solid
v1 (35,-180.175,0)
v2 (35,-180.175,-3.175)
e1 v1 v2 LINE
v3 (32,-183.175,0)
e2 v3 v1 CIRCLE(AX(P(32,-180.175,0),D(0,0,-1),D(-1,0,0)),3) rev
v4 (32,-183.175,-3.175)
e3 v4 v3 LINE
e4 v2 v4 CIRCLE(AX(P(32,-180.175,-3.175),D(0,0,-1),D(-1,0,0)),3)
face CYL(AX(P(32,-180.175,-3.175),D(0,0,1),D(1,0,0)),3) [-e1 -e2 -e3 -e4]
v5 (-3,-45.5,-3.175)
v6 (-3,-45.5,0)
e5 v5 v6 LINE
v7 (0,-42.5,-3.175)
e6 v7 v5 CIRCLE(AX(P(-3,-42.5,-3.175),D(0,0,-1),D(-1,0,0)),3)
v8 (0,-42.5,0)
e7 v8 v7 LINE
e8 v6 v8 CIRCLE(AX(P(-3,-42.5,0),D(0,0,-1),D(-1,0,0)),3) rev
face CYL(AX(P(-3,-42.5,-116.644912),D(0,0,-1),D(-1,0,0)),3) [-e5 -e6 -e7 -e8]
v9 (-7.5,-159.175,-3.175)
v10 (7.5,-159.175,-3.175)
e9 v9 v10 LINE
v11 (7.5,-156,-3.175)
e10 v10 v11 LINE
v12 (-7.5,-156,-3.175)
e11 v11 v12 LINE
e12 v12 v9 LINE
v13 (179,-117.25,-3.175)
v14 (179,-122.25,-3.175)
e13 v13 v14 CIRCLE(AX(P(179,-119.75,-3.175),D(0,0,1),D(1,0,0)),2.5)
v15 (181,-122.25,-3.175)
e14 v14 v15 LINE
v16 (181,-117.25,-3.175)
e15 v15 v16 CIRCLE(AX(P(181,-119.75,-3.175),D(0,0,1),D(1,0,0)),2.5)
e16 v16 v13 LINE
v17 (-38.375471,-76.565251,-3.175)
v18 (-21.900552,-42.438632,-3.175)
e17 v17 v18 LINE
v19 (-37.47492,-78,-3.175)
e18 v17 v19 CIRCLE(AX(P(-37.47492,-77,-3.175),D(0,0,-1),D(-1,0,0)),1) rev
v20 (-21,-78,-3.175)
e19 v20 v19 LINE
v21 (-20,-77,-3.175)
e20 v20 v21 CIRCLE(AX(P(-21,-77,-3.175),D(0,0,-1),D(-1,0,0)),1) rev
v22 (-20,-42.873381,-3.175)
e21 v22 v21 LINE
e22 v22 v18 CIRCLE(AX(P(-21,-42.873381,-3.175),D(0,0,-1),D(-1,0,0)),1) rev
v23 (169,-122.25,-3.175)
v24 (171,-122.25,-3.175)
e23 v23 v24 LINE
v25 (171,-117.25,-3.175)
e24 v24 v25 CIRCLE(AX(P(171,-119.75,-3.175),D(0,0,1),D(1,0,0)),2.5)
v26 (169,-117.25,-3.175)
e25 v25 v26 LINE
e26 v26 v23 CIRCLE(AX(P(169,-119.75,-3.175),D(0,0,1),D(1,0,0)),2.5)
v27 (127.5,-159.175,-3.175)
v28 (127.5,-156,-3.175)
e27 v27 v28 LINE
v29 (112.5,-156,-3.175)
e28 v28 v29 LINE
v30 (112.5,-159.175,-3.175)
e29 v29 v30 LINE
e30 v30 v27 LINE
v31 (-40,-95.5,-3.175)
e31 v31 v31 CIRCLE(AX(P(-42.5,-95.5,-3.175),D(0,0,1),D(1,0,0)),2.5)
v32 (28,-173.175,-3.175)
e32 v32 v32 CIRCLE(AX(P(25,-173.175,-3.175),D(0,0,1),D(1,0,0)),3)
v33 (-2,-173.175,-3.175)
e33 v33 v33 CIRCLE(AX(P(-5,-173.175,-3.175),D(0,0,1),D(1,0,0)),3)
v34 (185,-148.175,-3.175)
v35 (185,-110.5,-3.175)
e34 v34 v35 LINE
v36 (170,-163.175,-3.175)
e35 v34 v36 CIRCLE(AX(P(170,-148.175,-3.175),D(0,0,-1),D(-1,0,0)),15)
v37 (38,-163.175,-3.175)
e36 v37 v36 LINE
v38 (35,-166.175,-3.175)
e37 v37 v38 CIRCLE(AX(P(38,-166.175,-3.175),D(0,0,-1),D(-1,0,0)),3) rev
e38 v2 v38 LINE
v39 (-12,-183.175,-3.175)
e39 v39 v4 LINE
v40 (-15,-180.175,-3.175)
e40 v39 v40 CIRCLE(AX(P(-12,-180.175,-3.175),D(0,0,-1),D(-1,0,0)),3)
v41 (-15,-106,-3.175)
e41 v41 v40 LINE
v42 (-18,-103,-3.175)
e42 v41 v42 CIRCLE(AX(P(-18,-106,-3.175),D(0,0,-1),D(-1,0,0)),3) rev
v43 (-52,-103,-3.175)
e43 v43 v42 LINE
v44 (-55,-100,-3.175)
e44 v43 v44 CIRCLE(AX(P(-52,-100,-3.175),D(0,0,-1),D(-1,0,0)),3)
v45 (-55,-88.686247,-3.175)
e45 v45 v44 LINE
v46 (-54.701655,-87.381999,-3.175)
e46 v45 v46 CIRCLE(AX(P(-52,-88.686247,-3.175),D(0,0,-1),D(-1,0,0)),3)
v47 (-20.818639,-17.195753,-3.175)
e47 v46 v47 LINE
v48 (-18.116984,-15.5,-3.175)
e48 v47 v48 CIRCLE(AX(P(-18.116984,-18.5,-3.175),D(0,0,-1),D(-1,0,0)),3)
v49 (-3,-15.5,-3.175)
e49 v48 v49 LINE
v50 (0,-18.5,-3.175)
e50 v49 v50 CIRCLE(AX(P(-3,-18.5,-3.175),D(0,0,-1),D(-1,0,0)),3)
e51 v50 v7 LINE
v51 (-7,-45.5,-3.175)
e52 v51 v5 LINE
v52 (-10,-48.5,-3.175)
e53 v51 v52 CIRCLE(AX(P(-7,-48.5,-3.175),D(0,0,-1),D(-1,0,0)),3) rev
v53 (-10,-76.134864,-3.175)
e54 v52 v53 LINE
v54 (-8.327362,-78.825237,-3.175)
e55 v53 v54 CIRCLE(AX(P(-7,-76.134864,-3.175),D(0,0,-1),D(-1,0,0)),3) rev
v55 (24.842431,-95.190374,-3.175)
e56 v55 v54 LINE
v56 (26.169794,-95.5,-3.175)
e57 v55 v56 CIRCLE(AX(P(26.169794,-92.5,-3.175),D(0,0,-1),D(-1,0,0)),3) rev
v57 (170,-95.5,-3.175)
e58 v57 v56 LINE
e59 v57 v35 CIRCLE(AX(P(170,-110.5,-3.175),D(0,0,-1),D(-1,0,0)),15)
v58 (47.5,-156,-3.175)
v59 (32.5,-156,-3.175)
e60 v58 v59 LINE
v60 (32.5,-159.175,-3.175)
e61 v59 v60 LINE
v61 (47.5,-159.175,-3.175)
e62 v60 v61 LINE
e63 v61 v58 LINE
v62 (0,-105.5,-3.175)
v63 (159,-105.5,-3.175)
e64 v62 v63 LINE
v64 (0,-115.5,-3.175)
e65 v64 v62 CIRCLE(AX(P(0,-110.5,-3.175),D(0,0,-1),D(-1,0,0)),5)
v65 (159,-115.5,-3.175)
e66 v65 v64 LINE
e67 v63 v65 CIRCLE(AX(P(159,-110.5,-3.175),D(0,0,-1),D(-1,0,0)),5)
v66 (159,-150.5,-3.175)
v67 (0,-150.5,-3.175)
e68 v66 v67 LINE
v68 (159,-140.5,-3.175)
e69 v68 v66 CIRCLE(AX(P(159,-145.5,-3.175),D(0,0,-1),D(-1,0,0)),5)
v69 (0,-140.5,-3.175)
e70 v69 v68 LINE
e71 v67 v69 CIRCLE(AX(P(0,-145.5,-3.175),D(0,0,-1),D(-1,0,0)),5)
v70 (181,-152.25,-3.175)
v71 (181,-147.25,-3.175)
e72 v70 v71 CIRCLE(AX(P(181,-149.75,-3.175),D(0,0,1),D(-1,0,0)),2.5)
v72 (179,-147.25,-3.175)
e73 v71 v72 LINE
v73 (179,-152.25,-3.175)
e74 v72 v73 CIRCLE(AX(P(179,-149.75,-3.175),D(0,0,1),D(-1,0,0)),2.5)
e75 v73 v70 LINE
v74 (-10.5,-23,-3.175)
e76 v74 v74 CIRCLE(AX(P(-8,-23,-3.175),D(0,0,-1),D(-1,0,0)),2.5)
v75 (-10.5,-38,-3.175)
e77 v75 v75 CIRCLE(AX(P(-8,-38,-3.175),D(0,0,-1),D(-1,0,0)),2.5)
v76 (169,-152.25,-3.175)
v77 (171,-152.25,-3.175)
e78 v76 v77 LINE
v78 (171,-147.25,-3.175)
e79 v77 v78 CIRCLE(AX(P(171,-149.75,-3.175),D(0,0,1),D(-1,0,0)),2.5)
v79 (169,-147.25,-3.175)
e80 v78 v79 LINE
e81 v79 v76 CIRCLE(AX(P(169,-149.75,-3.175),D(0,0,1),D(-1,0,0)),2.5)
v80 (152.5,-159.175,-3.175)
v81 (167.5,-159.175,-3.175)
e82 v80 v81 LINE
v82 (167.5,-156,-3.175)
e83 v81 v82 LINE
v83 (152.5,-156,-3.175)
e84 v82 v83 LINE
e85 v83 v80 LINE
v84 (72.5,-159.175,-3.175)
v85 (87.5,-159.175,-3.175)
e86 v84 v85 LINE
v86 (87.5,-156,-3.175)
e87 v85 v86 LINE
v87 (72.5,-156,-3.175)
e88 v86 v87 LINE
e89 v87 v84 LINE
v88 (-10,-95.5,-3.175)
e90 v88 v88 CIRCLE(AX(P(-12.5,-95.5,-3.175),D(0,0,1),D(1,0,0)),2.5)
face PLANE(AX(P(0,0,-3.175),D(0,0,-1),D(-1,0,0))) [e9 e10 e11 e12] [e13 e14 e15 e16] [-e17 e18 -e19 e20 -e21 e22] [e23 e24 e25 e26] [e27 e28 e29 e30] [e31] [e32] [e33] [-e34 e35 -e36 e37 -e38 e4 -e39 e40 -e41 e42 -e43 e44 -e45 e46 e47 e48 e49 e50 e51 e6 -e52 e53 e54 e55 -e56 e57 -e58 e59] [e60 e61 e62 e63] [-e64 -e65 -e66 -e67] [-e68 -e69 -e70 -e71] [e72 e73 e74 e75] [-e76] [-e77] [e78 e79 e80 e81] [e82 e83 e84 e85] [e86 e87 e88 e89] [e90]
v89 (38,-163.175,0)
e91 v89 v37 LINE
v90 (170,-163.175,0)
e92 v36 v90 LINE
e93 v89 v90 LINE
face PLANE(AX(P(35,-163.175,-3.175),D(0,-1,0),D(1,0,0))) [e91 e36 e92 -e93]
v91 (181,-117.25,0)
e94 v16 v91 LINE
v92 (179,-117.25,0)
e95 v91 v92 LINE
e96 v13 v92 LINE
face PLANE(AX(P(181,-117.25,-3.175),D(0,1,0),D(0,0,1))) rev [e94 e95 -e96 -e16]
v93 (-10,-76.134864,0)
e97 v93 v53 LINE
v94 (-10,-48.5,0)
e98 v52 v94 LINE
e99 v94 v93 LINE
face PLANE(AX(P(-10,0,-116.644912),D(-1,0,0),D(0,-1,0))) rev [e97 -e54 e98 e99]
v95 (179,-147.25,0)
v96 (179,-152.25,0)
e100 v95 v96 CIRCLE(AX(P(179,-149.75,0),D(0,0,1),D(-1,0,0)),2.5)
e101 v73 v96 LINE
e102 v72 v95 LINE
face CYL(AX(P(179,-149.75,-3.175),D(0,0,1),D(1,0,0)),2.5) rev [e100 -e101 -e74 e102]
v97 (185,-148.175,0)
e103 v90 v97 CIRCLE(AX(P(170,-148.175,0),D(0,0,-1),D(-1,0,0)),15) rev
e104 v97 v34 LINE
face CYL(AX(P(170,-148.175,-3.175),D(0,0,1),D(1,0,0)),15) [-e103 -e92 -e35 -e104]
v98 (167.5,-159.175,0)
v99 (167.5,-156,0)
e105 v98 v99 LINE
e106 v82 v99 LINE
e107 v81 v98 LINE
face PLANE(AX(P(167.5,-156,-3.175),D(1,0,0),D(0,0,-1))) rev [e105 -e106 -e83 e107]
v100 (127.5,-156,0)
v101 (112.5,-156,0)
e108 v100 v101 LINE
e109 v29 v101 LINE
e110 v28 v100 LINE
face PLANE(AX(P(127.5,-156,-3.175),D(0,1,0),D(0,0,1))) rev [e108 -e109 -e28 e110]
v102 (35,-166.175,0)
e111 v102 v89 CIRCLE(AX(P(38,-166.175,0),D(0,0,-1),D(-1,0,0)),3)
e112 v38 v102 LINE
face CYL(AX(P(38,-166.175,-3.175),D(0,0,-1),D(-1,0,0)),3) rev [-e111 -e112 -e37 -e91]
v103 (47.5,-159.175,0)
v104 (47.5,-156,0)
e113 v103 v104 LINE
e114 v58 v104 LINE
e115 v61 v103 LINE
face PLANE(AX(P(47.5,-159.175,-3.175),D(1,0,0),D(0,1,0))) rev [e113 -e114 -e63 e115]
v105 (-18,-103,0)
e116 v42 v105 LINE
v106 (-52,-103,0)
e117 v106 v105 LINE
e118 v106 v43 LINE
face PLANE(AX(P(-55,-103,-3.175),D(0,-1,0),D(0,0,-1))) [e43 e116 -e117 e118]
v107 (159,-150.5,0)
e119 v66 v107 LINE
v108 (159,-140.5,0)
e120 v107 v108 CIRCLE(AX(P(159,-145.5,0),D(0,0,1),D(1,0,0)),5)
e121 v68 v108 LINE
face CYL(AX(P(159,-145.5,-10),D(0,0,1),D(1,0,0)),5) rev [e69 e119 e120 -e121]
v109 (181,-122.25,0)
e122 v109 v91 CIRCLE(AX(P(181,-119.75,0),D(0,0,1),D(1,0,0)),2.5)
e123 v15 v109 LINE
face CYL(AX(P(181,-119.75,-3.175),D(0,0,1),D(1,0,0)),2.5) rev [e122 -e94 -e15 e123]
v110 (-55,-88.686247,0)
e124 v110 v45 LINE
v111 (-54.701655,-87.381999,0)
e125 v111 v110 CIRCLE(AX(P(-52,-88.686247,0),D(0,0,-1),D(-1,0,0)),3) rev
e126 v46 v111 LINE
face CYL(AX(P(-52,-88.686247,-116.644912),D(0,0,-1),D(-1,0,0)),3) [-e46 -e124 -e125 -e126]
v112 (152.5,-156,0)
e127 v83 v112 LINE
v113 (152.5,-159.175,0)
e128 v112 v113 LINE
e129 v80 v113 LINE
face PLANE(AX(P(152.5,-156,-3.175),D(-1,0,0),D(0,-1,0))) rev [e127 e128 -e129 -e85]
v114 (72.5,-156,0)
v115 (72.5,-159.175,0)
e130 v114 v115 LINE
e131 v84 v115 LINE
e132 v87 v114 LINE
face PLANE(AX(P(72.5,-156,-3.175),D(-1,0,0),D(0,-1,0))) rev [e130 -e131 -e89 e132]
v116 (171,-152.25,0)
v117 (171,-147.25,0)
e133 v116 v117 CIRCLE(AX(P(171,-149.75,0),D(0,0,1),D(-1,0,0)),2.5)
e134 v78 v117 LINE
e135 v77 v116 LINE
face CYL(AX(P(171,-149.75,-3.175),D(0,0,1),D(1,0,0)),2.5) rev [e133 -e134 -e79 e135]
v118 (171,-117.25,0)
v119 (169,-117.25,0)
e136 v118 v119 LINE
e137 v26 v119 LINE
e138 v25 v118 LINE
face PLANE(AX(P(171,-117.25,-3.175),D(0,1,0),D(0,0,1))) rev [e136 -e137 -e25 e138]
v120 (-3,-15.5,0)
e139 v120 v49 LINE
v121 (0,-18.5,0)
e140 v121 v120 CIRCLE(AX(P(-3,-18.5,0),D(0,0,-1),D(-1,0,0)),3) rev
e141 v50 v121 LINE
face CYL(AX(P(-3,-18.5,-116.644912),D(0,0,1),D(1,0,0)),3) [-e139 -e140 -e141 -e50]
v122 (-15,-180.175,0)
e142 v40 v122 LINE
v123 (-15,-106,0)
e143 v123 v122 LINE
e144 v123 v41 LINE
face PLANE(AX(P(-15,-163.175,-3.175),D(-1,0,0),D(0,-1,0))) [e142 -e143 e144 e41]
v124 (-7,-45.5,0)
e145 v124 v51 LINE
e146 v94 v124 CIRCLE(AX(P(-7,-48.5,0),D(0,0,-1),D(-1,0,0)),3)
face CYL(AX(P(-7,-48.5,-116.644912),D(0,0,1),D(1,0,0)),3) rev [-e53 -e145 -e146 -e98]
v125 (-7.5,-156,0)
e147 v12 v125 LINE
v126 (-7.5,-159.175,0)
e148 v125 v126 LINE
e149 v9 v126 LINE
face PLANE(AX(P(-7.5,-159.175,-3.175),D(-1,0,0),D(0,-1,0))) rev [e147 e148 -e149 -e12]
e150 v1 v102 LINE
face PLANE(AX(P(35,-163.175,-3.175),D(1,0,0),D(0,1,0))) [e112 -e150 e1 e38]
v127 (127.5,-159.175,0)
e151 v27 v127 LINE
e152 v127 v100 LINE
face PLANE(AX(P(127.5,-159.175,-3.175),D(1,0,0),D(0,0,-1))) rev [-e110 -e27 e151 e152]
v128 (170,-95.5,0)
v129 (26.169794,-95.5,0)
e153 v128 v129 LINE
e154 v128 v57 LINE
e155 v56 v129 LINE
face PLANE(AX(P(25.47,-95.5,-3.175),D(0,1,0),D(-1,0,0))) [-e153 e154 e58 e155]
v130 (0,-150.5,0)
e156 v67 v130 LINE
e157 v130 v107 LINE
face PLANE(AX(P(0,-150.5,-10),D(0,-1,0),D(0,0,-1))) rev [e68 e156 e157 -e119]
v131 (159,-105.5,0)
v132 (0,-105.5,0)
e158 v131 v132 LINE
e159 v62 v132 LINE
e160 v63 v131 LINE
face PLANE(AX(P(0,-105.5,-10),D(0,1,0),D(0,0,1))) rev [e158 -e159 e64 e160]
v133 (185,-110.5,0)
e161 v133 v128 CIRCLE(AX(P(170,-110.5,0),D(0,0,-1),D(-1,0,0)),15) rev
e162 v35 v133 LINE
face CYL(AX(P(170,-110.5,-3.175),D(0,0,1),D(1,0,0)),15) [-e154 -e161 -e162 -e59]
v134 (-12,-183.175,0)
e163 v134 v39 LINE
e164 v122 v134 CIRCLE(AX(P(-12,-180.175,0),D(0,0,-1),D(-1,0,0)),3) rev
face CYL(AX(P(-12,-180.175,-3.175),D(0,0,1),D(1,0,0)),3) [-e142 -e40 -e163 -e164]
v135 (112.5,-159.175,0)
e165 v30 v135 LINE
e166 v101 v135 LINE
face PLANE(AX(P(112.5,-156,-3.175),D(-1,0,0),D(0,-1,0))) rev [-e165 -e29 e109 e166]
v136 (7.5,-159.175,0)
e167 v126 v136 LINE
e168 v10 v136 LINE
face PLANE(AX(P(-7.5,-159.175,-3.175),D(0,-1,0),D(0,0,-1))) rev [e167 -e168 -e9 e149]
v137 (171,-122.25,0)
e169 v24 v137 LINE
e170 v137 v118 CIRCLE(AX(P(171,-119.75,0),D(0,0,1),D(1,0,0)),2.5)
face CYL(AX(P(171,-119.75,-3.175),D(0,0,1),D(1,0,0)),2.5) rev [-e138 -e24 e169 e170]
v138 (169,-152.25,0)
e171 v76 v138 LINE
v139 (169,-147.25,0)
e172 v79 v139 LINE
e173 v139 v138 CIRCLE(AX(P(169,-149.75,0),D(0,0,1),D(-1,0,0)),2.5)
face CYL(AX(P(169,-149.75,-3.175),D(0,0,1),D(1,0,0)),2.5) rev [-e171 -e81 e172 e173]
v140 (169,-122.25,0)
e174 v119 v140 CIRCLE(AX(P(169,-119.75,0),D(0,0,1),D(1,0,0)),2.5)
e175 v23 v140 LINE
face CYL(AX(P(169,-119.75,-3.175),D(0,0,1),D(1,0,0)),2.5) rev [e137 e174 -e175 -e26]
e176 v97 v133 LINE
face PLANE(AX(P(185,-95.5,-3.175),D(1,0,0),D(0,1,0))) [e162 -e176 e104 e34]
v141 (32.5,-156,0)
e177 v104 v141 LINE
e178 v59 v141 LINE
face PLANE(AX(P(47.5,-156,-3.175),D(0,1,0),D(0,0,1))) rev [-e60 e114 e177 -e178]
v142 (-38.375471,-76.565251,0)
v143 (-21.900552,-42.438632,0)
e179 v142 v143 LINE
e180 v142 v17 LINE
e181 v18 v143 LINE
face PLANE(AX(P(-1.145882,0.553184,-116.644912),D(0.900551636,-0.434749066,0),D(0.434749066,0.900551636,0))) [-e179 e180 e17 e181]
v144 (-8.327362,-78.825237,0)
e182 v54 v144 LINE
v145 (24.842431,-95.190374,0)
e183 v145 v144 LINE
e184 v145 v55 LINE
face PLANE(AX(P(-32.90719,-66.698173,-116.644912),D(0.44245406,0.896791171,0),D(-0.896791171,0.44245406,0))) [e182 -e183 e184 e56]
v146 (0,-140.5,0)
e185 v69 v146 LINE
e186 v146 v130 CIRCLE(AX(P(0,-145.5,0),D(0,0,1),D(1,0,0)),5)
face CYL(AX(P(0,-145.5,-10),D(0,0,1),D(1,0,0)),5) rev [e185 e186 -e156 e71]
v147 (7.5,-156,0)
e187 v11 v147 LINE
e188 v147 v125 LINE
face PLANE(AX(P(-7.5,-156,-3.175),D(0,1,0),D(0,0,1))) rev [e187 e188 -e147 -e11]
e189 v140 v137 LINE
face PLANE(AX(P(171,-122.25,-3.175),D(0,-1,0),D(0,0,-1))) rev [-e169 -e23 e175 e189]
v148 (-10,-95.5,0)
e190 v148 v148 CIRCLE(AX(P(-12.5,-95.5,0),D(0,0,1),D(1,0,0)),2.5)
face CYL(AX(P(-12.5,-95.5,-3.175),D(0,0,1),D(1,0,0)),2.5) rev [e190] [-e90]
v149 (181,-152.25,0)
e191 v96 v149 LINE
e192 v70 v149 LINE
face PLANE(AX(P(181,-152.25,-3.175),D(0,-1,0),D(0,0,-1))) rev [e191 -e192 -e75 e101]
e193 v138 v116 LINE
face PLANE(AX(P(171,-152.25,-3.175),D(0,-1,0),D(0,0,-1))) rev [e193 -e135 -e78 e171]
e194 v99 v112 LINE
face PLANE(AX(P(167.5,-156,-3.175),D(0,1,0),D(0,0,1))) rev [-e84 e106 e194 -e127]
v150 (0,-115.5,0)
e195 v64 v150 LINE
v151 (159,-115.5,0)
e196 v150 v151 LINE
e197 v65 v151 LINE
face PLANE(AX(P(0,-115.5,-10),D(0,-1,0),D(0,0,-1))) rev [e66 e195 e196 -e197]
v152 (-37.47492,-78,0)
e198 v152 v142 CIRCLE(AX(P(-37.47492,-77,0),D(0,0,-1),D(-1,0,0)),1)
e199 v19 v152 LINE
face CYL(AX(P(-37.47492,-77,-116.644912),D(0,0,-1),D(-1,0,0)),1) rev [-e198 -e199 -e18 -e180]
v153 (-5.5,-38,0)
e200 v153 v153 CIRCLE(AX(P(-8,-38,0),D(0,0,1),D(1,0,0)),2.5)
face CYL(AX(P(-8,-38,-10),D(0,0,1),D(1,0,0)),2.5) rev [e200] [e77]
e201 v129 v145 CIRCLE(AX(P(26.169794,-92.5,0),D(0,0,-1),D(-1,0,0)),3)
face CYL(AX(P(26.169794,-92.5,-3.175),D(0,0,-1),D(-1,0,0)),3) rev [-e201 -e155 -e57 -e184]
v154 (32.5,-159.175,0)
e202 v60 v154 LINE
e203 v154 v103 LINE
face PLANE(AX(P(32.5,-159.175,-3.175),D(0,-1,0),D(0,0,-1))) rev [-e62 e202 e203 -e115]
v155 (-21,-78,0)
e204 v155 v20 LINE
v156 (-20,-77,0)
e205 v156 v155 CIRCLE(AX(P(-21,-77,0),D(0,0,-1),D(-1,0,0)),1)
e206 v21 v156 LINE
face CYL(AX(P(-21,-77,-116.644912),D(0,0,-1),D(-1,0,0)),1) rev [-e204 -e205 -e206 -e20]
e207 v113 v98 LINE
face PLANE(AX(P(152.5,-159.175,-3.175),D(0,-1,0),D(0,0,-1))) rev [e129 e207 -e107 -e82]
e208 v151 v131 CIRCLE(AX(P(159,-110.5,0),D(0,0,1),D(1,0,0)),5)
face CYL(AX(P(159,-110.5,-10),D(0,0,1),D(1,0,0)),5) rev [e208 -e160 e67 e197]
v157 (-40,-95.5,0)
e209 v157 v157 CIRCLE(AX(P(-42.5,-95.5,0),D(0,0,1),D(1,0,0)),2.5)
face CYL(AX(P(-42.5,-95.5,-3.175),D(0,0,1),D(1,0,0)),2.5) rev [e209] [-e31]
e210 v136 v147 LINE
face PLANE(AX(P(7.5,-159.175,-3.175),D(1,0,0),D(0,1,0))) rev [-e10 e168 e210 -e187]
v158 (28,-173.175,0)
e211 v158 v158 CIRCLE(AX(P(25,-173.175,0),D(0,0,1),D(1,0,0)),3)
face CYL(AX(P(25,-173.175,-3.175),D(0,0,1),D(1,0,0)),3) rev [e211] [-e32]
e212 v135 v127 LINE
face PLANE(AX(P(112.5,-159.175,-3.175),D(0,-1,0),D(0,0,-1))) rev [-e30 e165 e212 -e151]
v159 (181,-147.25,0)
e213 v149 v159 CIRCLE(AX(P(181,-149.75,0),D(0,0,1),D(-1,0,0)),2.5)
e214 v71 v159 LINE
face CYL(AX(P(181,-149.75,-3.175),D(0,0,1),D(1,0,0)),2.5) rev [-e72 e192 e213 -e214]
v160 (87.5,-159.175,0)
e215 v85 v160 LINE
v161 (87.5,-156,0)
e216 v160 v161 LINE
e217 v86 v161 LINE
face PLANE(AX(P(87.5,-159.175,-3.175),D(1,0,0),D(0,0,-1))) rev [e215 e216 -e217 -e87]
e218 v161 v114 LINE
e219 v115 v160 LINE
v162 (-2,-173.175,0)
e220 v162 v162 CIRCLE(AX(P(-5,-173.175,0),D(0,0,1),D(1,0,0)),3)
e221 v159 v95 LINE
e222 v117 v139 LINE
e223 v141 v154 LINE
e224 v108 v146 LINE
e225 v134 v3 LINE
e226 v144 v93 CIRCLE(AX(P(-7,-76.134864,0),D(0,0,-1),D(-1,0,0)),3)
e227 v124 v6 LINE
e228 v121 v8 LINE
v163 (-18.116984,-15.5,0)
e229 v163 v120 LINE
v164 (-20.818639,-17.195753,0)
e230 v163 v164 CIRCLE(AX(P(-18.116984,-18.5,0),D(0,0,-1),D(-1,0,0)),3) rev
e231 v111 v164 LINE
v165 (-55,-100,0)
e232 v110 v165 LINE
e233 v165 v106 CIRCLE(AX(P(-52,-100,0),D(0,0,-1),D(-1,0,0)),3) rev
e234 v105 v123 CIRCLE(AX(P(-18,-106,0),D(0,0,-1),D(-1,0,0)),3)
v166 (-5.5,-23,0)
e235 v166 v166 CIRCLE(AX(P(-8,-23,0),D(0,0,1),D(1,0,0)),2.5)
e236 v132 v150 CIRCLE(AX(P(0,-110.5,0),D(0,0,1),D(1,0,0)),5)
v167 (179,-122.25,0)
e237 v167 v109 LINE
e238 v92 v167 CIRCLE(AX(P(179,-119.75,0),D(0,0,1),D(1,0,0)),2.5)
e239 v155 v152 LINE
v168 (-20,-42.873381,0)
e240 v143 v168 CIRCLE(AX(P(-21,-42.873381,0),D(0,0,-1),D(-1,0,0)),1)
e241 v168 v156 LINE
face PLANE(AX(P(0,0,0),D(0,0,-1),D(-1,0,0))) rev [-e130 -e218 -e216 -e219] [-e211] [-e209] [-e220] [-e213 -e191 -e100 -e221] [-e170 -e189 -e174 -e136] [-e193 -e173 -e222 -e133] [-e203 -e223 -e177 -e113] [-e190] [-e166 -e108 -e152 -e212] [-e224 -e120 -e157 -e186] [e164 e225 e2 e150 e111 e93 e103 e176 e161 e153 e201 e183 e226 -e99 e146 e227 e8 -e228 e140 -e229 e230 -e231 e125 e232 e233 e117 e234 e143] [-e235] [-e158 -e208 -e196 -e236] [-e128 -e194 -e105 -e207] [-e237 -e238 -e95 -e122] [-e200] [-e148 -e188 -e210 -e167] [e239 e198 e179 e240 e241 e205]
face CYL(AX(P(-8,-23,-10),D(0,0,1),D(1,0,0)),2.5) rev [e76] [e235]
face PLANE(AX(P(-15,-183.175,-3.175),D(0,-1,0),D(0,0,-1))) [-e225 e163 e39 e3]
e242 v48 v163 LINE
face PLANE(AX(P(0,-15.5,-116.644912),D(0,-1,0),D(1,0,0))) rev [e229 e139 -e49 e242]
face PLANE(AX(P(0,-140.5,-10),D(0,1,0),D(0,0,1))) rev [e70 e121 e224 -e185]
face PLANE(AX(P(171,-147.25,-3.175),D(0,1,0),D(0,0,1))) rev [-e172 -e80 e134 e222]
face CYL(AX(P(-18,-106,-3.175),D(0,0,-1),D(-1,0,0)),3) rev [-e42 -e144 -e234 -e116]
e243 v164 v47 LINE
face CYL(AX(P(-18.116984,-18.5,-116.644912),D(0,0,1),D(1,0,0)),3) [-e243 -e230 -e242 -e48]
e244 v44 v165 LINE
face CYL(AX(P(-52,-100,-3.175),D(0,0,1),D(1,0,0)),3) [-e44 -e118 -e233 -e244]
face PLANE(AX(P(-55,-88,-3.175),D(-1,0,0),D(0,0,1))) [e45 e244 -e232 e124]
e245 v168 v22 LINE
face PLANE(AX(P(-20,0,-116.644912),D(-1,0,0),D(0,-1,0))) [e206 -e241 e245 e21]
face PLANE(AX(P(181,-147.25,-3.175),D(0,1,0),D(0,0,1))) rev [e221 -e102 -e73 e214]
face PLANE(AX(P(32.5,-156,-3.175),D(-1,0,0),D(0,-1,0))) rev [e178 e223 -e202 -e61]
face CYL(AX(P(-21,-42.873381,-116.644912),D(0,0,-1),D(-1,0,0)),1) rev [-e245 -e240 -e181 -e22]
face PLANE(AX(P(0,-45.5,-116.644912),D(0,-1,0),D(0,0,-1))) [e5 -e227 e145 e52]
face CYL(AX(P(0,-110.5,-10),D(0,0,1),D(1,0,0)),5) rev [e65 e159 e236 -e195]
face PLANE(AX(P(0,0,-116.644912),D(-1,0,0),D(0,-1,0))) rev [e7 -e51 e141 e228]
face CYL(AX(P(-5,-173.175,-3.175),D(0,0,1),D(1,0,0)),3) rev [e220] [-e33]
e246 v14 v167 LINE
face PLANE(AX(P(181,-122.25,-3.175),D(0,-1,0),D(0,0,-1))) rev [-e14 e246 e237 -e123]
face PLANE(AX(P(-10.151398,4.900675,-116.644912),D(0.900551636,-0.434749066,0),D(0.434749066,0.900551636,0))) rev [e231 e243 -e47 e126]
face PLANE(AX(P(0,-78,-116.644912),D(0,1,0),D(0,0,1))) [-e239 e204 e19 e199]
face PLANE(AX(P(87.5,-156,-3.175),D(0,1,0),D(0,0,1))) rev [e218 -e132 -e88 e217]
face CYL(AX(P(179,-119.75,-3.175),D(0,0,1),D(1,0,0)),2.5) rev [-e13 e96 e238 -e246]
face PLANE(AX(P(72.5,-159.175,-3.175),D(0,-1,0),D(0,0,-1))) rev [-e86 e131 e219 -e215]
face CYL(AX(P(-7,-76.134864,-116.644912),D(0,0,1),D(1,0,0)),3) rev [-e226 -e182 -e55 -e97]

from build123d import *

# Parameters (mm, degrees)
SKETCH1_R           = 3
SKETCH1_R_2         = 2.5
SKETCH1_W           = 15
SKETCH1_H           = 3.175
BASE_FLANGE1_DEPTH  = 3.175
CUT_EXTRUDE1_DEPTH  = 10
SKETCH3_W           = 10
SKETCH3_H           = 30
BOSS_EXTRUDE1_DEPTH = 3.175
FILLET2_R           = 3
FILLET1_R           = 15
FILLET3_R           = 1
SKETCH4_R           = 2.5
CUT_EXTRUDE2_DEPTH  = 10
SKETCH5_W           = 6.305242908
SKETCH5_H           = 6.547752252
BOSS_EXTRUDE2_DEPTH = 3.175


# Sheet-metal steps are written as plain solids
with BuildPart() as part:
    # Sketch1 → Base-Flange1 (new body)
    with BuildSketch(Plane.XY):
        Polygon((-4.193265857, -88), (25.47, -95.5), (185, -95.5), (185, -143.5), (185, -148.5), (185, -163.175), (35, -163.175), (35, -183.175), (-15, -183.175), (-15, -163.175), (-15, -150.03), (-15, -103), (-55, -103), (-55, -88), align=None)
        with Locations((-5, -173.175)):
            Circle(SKETCH1_R, mode=Mode.SUBTRACT)
        with Locations((25, -173.175)):
            Circle(SKETCH1_R, mode=Mode.SUBTRACT)
        with Locations((-42.5, -95.5)):
            Circle(SKETCH1_R_2, mode=Mode.SUBTRACT)
        with Locations((-12.5, -95.5)):
            Circle(SKETCH1_R_2, mode=Mode.SUBTRACT)
        with Locations((160, -157.5875)):
            Rectangle(SKETCH1_W, SKETCH1_H, mode=Mode.SUBTRACT)
        with Locations((40, -157.5875)):
            Rectangle(SKETCH1_W, SKETCH1_H, mode=Mode.SUBTRACT)
        with Locations((0, -157.5875)):
            Rectangle(SKETCH1_W, SKETCH1_H, mode=Mode.SUBTRACT)
        with Locations((80, -157.5875)):
            Rectangle(SKETCH1_W, SKETCH1_H, mode=Mode.SUBTRACT)
        with Locations((120, -157.5875)):
            Rectangle(SKETCH1_W, SKETCH1_H, mode=Mode.SUBTRACT)
        with BuildLine():
            Line((181, -122.25), (179, -122.25))
            ThreePointArc((179, -122.25), (176.5, -119.75), (179, -117.25))
            Line((179, -117.25), (181, -117.25))
            ThreePointArc((181, -117.25), (183.5, -119.75), (181, -122.25))
        make_face(mode=Mode.SUBTRACT)
        with BuildLine():
            Line((171, -122.25), (169, -122.25))
            ThreePointArc((169, -122.25), (166.5, -119.75), (169, -117.25))
            Line((169, -117.25), (171, -117.25))
            ThreePointArc((171, -117.25), (173.5, -119.75), (171, -122.25))
        make_face(mode=Mode.SUBTRACT)
        with BuildLine():
            Line((171, -147.25), (169, -147.25))
            ThreePointArc((169, -147.25), (166.5, -149.75), (169, -152.25))
            Line((169, -152.25), (171, -152.25))
            ThreePointArc((171, -152.25), (173.5, -149.75), (171, -147.25))
        make_face(mode=Mode.SUBTRACT)
        with BuildLine():
            Line((181, -147.25), (179, -147.25))
            ThreePointArc((179, -147.25), (176.5, -149.75), (179, -152.25))
            Line((179, -152.25), (181, -152.25))
            ThreePointArc((181, -152.25), (183.5, -149.75), (181, -147.25))
        make_face(mode=Mode.SUBTRACT)
    extrude(amount=-BASE_FLANGE1_DEPTH)

    # Sketch2 → Cut-Extrude1 (cut)
    with BuildSketch(Plane.XY):
        with BuildLine():
            Line((0, -105.5), (159, -105.5))
            ThreePointArc((159, -105.5), (164, -110.5), (159, -115.5))
            Line((159, -115.5), (0, -115.5))
            ThreePointArc((0, -115.5), (-5, -110.5), (0, -105.5))
        make_face()
        with BuildLine():
            Line((0, -140.5), (159, -140.5))
            ThreePointArc((159, -140.5), (164, -145.5), (159, -150.5))
            Line((159, -150.5), (0, -150.5))
            ThreePointArc((0, -150.5), (-5, -145.5), (0, -140.5))
        make_face()
    extrude(amount=-CUT_EXTRUDE1_DEPTH, mode=Mode.SUBTRACT)

    # Sketch3 → Boss-Extrude1 (add)
    # profile 1 of 3: a face of its own
    with BuildSketch(Plane.XY):
        Polygon((-20, -15.5), (-55, -88), (-10, -88), (-10, -78), (-10, -45.5), (-10, -15.5), align=None)
        Polygon((-20, -38.501774554), (-20, -78), (-39.068108836, -78), align=None, mode=Mode.SUBTRACT)
    # profile 2 of 3: a face of its own
    with BuildSketch(Plane.XY):
        Polygon((-10, -78), (-10, -88), (25.47, -95.5), align=None)
    # profile 3 of 3: a face of its own
    with BuildSketch(Plane.XY):
        with Locations((-5, -30.5)):
            Rectangle(SKETCH3_W, SKETCH3_H)
    extrude(amount=-BOSS_EXTRUDE1_DEPTH)

    # Fillet2
    fillet2_edges = [part.edges().sort_by_distance(p)[0] for p in [
        (25.47, -95.5, -1.5875),
        (35, -163.175, -1.5875),
        (35, -183.175, -1.5875),
        (-15, -183.175, -1.5875),
        (-15, -103, -1.5875),
        (-55, -103, -1.5875),
        (-55, -88, -1.5875),
        (0, -45.5, -1.5875),
        (0, -15.5, -1.5875),
        (-20, -15.5, -1.5875),
        (-10, -78, -1.5875),
        (-10, -45.5, -1.5875),
    ]]
    fillet(fillet2_edges, radius=FILLET2_R)

    # Fillet1
    fillet1_edges = [part.edges().sort_by_distance(p)[0] for p in [
        (185, -95.5, -1.5875),
        (185, -163.175, -1.5875),
    ]]
    fillet(fillet1_edges, radius=FILLET1_R)

    # Fillet3
    fillet3_edges = [part.edges().sort_by_distance(p)[0] for p in [
        (-20, -78, -1.5875),
        (-39.068108836, -78, -1.5875),
        (-20, -38.501774554, -1.5875),
    ]]
    fillet(fillet3_edges, radius=FILLET3_R)

    # Sketch4 → Cut-Extrude2 (cut)
    with BuildSketch(Plane.XY):
        with Locations((-8, -23)):
            Circle(SKETCH4_R)
        with Locations((-8, -38)):
            Circle(SKETCH4_R)
    extrude(amount=-CUT_EXTRUDE2_DEPTH, mode=Mode.SUBTRACT)

    # Sketch5 → Boss-Extrude2 (add)
    with BuildSketch(Plane.XY):
        with Locations((-8.695694073, -86.656931436)):
            Rectangle(SKETCH5_W, SKETCH5_H)
    extrude(amount=-BOSS_EXTRUDE2_DEPTH)


solid = part.part
